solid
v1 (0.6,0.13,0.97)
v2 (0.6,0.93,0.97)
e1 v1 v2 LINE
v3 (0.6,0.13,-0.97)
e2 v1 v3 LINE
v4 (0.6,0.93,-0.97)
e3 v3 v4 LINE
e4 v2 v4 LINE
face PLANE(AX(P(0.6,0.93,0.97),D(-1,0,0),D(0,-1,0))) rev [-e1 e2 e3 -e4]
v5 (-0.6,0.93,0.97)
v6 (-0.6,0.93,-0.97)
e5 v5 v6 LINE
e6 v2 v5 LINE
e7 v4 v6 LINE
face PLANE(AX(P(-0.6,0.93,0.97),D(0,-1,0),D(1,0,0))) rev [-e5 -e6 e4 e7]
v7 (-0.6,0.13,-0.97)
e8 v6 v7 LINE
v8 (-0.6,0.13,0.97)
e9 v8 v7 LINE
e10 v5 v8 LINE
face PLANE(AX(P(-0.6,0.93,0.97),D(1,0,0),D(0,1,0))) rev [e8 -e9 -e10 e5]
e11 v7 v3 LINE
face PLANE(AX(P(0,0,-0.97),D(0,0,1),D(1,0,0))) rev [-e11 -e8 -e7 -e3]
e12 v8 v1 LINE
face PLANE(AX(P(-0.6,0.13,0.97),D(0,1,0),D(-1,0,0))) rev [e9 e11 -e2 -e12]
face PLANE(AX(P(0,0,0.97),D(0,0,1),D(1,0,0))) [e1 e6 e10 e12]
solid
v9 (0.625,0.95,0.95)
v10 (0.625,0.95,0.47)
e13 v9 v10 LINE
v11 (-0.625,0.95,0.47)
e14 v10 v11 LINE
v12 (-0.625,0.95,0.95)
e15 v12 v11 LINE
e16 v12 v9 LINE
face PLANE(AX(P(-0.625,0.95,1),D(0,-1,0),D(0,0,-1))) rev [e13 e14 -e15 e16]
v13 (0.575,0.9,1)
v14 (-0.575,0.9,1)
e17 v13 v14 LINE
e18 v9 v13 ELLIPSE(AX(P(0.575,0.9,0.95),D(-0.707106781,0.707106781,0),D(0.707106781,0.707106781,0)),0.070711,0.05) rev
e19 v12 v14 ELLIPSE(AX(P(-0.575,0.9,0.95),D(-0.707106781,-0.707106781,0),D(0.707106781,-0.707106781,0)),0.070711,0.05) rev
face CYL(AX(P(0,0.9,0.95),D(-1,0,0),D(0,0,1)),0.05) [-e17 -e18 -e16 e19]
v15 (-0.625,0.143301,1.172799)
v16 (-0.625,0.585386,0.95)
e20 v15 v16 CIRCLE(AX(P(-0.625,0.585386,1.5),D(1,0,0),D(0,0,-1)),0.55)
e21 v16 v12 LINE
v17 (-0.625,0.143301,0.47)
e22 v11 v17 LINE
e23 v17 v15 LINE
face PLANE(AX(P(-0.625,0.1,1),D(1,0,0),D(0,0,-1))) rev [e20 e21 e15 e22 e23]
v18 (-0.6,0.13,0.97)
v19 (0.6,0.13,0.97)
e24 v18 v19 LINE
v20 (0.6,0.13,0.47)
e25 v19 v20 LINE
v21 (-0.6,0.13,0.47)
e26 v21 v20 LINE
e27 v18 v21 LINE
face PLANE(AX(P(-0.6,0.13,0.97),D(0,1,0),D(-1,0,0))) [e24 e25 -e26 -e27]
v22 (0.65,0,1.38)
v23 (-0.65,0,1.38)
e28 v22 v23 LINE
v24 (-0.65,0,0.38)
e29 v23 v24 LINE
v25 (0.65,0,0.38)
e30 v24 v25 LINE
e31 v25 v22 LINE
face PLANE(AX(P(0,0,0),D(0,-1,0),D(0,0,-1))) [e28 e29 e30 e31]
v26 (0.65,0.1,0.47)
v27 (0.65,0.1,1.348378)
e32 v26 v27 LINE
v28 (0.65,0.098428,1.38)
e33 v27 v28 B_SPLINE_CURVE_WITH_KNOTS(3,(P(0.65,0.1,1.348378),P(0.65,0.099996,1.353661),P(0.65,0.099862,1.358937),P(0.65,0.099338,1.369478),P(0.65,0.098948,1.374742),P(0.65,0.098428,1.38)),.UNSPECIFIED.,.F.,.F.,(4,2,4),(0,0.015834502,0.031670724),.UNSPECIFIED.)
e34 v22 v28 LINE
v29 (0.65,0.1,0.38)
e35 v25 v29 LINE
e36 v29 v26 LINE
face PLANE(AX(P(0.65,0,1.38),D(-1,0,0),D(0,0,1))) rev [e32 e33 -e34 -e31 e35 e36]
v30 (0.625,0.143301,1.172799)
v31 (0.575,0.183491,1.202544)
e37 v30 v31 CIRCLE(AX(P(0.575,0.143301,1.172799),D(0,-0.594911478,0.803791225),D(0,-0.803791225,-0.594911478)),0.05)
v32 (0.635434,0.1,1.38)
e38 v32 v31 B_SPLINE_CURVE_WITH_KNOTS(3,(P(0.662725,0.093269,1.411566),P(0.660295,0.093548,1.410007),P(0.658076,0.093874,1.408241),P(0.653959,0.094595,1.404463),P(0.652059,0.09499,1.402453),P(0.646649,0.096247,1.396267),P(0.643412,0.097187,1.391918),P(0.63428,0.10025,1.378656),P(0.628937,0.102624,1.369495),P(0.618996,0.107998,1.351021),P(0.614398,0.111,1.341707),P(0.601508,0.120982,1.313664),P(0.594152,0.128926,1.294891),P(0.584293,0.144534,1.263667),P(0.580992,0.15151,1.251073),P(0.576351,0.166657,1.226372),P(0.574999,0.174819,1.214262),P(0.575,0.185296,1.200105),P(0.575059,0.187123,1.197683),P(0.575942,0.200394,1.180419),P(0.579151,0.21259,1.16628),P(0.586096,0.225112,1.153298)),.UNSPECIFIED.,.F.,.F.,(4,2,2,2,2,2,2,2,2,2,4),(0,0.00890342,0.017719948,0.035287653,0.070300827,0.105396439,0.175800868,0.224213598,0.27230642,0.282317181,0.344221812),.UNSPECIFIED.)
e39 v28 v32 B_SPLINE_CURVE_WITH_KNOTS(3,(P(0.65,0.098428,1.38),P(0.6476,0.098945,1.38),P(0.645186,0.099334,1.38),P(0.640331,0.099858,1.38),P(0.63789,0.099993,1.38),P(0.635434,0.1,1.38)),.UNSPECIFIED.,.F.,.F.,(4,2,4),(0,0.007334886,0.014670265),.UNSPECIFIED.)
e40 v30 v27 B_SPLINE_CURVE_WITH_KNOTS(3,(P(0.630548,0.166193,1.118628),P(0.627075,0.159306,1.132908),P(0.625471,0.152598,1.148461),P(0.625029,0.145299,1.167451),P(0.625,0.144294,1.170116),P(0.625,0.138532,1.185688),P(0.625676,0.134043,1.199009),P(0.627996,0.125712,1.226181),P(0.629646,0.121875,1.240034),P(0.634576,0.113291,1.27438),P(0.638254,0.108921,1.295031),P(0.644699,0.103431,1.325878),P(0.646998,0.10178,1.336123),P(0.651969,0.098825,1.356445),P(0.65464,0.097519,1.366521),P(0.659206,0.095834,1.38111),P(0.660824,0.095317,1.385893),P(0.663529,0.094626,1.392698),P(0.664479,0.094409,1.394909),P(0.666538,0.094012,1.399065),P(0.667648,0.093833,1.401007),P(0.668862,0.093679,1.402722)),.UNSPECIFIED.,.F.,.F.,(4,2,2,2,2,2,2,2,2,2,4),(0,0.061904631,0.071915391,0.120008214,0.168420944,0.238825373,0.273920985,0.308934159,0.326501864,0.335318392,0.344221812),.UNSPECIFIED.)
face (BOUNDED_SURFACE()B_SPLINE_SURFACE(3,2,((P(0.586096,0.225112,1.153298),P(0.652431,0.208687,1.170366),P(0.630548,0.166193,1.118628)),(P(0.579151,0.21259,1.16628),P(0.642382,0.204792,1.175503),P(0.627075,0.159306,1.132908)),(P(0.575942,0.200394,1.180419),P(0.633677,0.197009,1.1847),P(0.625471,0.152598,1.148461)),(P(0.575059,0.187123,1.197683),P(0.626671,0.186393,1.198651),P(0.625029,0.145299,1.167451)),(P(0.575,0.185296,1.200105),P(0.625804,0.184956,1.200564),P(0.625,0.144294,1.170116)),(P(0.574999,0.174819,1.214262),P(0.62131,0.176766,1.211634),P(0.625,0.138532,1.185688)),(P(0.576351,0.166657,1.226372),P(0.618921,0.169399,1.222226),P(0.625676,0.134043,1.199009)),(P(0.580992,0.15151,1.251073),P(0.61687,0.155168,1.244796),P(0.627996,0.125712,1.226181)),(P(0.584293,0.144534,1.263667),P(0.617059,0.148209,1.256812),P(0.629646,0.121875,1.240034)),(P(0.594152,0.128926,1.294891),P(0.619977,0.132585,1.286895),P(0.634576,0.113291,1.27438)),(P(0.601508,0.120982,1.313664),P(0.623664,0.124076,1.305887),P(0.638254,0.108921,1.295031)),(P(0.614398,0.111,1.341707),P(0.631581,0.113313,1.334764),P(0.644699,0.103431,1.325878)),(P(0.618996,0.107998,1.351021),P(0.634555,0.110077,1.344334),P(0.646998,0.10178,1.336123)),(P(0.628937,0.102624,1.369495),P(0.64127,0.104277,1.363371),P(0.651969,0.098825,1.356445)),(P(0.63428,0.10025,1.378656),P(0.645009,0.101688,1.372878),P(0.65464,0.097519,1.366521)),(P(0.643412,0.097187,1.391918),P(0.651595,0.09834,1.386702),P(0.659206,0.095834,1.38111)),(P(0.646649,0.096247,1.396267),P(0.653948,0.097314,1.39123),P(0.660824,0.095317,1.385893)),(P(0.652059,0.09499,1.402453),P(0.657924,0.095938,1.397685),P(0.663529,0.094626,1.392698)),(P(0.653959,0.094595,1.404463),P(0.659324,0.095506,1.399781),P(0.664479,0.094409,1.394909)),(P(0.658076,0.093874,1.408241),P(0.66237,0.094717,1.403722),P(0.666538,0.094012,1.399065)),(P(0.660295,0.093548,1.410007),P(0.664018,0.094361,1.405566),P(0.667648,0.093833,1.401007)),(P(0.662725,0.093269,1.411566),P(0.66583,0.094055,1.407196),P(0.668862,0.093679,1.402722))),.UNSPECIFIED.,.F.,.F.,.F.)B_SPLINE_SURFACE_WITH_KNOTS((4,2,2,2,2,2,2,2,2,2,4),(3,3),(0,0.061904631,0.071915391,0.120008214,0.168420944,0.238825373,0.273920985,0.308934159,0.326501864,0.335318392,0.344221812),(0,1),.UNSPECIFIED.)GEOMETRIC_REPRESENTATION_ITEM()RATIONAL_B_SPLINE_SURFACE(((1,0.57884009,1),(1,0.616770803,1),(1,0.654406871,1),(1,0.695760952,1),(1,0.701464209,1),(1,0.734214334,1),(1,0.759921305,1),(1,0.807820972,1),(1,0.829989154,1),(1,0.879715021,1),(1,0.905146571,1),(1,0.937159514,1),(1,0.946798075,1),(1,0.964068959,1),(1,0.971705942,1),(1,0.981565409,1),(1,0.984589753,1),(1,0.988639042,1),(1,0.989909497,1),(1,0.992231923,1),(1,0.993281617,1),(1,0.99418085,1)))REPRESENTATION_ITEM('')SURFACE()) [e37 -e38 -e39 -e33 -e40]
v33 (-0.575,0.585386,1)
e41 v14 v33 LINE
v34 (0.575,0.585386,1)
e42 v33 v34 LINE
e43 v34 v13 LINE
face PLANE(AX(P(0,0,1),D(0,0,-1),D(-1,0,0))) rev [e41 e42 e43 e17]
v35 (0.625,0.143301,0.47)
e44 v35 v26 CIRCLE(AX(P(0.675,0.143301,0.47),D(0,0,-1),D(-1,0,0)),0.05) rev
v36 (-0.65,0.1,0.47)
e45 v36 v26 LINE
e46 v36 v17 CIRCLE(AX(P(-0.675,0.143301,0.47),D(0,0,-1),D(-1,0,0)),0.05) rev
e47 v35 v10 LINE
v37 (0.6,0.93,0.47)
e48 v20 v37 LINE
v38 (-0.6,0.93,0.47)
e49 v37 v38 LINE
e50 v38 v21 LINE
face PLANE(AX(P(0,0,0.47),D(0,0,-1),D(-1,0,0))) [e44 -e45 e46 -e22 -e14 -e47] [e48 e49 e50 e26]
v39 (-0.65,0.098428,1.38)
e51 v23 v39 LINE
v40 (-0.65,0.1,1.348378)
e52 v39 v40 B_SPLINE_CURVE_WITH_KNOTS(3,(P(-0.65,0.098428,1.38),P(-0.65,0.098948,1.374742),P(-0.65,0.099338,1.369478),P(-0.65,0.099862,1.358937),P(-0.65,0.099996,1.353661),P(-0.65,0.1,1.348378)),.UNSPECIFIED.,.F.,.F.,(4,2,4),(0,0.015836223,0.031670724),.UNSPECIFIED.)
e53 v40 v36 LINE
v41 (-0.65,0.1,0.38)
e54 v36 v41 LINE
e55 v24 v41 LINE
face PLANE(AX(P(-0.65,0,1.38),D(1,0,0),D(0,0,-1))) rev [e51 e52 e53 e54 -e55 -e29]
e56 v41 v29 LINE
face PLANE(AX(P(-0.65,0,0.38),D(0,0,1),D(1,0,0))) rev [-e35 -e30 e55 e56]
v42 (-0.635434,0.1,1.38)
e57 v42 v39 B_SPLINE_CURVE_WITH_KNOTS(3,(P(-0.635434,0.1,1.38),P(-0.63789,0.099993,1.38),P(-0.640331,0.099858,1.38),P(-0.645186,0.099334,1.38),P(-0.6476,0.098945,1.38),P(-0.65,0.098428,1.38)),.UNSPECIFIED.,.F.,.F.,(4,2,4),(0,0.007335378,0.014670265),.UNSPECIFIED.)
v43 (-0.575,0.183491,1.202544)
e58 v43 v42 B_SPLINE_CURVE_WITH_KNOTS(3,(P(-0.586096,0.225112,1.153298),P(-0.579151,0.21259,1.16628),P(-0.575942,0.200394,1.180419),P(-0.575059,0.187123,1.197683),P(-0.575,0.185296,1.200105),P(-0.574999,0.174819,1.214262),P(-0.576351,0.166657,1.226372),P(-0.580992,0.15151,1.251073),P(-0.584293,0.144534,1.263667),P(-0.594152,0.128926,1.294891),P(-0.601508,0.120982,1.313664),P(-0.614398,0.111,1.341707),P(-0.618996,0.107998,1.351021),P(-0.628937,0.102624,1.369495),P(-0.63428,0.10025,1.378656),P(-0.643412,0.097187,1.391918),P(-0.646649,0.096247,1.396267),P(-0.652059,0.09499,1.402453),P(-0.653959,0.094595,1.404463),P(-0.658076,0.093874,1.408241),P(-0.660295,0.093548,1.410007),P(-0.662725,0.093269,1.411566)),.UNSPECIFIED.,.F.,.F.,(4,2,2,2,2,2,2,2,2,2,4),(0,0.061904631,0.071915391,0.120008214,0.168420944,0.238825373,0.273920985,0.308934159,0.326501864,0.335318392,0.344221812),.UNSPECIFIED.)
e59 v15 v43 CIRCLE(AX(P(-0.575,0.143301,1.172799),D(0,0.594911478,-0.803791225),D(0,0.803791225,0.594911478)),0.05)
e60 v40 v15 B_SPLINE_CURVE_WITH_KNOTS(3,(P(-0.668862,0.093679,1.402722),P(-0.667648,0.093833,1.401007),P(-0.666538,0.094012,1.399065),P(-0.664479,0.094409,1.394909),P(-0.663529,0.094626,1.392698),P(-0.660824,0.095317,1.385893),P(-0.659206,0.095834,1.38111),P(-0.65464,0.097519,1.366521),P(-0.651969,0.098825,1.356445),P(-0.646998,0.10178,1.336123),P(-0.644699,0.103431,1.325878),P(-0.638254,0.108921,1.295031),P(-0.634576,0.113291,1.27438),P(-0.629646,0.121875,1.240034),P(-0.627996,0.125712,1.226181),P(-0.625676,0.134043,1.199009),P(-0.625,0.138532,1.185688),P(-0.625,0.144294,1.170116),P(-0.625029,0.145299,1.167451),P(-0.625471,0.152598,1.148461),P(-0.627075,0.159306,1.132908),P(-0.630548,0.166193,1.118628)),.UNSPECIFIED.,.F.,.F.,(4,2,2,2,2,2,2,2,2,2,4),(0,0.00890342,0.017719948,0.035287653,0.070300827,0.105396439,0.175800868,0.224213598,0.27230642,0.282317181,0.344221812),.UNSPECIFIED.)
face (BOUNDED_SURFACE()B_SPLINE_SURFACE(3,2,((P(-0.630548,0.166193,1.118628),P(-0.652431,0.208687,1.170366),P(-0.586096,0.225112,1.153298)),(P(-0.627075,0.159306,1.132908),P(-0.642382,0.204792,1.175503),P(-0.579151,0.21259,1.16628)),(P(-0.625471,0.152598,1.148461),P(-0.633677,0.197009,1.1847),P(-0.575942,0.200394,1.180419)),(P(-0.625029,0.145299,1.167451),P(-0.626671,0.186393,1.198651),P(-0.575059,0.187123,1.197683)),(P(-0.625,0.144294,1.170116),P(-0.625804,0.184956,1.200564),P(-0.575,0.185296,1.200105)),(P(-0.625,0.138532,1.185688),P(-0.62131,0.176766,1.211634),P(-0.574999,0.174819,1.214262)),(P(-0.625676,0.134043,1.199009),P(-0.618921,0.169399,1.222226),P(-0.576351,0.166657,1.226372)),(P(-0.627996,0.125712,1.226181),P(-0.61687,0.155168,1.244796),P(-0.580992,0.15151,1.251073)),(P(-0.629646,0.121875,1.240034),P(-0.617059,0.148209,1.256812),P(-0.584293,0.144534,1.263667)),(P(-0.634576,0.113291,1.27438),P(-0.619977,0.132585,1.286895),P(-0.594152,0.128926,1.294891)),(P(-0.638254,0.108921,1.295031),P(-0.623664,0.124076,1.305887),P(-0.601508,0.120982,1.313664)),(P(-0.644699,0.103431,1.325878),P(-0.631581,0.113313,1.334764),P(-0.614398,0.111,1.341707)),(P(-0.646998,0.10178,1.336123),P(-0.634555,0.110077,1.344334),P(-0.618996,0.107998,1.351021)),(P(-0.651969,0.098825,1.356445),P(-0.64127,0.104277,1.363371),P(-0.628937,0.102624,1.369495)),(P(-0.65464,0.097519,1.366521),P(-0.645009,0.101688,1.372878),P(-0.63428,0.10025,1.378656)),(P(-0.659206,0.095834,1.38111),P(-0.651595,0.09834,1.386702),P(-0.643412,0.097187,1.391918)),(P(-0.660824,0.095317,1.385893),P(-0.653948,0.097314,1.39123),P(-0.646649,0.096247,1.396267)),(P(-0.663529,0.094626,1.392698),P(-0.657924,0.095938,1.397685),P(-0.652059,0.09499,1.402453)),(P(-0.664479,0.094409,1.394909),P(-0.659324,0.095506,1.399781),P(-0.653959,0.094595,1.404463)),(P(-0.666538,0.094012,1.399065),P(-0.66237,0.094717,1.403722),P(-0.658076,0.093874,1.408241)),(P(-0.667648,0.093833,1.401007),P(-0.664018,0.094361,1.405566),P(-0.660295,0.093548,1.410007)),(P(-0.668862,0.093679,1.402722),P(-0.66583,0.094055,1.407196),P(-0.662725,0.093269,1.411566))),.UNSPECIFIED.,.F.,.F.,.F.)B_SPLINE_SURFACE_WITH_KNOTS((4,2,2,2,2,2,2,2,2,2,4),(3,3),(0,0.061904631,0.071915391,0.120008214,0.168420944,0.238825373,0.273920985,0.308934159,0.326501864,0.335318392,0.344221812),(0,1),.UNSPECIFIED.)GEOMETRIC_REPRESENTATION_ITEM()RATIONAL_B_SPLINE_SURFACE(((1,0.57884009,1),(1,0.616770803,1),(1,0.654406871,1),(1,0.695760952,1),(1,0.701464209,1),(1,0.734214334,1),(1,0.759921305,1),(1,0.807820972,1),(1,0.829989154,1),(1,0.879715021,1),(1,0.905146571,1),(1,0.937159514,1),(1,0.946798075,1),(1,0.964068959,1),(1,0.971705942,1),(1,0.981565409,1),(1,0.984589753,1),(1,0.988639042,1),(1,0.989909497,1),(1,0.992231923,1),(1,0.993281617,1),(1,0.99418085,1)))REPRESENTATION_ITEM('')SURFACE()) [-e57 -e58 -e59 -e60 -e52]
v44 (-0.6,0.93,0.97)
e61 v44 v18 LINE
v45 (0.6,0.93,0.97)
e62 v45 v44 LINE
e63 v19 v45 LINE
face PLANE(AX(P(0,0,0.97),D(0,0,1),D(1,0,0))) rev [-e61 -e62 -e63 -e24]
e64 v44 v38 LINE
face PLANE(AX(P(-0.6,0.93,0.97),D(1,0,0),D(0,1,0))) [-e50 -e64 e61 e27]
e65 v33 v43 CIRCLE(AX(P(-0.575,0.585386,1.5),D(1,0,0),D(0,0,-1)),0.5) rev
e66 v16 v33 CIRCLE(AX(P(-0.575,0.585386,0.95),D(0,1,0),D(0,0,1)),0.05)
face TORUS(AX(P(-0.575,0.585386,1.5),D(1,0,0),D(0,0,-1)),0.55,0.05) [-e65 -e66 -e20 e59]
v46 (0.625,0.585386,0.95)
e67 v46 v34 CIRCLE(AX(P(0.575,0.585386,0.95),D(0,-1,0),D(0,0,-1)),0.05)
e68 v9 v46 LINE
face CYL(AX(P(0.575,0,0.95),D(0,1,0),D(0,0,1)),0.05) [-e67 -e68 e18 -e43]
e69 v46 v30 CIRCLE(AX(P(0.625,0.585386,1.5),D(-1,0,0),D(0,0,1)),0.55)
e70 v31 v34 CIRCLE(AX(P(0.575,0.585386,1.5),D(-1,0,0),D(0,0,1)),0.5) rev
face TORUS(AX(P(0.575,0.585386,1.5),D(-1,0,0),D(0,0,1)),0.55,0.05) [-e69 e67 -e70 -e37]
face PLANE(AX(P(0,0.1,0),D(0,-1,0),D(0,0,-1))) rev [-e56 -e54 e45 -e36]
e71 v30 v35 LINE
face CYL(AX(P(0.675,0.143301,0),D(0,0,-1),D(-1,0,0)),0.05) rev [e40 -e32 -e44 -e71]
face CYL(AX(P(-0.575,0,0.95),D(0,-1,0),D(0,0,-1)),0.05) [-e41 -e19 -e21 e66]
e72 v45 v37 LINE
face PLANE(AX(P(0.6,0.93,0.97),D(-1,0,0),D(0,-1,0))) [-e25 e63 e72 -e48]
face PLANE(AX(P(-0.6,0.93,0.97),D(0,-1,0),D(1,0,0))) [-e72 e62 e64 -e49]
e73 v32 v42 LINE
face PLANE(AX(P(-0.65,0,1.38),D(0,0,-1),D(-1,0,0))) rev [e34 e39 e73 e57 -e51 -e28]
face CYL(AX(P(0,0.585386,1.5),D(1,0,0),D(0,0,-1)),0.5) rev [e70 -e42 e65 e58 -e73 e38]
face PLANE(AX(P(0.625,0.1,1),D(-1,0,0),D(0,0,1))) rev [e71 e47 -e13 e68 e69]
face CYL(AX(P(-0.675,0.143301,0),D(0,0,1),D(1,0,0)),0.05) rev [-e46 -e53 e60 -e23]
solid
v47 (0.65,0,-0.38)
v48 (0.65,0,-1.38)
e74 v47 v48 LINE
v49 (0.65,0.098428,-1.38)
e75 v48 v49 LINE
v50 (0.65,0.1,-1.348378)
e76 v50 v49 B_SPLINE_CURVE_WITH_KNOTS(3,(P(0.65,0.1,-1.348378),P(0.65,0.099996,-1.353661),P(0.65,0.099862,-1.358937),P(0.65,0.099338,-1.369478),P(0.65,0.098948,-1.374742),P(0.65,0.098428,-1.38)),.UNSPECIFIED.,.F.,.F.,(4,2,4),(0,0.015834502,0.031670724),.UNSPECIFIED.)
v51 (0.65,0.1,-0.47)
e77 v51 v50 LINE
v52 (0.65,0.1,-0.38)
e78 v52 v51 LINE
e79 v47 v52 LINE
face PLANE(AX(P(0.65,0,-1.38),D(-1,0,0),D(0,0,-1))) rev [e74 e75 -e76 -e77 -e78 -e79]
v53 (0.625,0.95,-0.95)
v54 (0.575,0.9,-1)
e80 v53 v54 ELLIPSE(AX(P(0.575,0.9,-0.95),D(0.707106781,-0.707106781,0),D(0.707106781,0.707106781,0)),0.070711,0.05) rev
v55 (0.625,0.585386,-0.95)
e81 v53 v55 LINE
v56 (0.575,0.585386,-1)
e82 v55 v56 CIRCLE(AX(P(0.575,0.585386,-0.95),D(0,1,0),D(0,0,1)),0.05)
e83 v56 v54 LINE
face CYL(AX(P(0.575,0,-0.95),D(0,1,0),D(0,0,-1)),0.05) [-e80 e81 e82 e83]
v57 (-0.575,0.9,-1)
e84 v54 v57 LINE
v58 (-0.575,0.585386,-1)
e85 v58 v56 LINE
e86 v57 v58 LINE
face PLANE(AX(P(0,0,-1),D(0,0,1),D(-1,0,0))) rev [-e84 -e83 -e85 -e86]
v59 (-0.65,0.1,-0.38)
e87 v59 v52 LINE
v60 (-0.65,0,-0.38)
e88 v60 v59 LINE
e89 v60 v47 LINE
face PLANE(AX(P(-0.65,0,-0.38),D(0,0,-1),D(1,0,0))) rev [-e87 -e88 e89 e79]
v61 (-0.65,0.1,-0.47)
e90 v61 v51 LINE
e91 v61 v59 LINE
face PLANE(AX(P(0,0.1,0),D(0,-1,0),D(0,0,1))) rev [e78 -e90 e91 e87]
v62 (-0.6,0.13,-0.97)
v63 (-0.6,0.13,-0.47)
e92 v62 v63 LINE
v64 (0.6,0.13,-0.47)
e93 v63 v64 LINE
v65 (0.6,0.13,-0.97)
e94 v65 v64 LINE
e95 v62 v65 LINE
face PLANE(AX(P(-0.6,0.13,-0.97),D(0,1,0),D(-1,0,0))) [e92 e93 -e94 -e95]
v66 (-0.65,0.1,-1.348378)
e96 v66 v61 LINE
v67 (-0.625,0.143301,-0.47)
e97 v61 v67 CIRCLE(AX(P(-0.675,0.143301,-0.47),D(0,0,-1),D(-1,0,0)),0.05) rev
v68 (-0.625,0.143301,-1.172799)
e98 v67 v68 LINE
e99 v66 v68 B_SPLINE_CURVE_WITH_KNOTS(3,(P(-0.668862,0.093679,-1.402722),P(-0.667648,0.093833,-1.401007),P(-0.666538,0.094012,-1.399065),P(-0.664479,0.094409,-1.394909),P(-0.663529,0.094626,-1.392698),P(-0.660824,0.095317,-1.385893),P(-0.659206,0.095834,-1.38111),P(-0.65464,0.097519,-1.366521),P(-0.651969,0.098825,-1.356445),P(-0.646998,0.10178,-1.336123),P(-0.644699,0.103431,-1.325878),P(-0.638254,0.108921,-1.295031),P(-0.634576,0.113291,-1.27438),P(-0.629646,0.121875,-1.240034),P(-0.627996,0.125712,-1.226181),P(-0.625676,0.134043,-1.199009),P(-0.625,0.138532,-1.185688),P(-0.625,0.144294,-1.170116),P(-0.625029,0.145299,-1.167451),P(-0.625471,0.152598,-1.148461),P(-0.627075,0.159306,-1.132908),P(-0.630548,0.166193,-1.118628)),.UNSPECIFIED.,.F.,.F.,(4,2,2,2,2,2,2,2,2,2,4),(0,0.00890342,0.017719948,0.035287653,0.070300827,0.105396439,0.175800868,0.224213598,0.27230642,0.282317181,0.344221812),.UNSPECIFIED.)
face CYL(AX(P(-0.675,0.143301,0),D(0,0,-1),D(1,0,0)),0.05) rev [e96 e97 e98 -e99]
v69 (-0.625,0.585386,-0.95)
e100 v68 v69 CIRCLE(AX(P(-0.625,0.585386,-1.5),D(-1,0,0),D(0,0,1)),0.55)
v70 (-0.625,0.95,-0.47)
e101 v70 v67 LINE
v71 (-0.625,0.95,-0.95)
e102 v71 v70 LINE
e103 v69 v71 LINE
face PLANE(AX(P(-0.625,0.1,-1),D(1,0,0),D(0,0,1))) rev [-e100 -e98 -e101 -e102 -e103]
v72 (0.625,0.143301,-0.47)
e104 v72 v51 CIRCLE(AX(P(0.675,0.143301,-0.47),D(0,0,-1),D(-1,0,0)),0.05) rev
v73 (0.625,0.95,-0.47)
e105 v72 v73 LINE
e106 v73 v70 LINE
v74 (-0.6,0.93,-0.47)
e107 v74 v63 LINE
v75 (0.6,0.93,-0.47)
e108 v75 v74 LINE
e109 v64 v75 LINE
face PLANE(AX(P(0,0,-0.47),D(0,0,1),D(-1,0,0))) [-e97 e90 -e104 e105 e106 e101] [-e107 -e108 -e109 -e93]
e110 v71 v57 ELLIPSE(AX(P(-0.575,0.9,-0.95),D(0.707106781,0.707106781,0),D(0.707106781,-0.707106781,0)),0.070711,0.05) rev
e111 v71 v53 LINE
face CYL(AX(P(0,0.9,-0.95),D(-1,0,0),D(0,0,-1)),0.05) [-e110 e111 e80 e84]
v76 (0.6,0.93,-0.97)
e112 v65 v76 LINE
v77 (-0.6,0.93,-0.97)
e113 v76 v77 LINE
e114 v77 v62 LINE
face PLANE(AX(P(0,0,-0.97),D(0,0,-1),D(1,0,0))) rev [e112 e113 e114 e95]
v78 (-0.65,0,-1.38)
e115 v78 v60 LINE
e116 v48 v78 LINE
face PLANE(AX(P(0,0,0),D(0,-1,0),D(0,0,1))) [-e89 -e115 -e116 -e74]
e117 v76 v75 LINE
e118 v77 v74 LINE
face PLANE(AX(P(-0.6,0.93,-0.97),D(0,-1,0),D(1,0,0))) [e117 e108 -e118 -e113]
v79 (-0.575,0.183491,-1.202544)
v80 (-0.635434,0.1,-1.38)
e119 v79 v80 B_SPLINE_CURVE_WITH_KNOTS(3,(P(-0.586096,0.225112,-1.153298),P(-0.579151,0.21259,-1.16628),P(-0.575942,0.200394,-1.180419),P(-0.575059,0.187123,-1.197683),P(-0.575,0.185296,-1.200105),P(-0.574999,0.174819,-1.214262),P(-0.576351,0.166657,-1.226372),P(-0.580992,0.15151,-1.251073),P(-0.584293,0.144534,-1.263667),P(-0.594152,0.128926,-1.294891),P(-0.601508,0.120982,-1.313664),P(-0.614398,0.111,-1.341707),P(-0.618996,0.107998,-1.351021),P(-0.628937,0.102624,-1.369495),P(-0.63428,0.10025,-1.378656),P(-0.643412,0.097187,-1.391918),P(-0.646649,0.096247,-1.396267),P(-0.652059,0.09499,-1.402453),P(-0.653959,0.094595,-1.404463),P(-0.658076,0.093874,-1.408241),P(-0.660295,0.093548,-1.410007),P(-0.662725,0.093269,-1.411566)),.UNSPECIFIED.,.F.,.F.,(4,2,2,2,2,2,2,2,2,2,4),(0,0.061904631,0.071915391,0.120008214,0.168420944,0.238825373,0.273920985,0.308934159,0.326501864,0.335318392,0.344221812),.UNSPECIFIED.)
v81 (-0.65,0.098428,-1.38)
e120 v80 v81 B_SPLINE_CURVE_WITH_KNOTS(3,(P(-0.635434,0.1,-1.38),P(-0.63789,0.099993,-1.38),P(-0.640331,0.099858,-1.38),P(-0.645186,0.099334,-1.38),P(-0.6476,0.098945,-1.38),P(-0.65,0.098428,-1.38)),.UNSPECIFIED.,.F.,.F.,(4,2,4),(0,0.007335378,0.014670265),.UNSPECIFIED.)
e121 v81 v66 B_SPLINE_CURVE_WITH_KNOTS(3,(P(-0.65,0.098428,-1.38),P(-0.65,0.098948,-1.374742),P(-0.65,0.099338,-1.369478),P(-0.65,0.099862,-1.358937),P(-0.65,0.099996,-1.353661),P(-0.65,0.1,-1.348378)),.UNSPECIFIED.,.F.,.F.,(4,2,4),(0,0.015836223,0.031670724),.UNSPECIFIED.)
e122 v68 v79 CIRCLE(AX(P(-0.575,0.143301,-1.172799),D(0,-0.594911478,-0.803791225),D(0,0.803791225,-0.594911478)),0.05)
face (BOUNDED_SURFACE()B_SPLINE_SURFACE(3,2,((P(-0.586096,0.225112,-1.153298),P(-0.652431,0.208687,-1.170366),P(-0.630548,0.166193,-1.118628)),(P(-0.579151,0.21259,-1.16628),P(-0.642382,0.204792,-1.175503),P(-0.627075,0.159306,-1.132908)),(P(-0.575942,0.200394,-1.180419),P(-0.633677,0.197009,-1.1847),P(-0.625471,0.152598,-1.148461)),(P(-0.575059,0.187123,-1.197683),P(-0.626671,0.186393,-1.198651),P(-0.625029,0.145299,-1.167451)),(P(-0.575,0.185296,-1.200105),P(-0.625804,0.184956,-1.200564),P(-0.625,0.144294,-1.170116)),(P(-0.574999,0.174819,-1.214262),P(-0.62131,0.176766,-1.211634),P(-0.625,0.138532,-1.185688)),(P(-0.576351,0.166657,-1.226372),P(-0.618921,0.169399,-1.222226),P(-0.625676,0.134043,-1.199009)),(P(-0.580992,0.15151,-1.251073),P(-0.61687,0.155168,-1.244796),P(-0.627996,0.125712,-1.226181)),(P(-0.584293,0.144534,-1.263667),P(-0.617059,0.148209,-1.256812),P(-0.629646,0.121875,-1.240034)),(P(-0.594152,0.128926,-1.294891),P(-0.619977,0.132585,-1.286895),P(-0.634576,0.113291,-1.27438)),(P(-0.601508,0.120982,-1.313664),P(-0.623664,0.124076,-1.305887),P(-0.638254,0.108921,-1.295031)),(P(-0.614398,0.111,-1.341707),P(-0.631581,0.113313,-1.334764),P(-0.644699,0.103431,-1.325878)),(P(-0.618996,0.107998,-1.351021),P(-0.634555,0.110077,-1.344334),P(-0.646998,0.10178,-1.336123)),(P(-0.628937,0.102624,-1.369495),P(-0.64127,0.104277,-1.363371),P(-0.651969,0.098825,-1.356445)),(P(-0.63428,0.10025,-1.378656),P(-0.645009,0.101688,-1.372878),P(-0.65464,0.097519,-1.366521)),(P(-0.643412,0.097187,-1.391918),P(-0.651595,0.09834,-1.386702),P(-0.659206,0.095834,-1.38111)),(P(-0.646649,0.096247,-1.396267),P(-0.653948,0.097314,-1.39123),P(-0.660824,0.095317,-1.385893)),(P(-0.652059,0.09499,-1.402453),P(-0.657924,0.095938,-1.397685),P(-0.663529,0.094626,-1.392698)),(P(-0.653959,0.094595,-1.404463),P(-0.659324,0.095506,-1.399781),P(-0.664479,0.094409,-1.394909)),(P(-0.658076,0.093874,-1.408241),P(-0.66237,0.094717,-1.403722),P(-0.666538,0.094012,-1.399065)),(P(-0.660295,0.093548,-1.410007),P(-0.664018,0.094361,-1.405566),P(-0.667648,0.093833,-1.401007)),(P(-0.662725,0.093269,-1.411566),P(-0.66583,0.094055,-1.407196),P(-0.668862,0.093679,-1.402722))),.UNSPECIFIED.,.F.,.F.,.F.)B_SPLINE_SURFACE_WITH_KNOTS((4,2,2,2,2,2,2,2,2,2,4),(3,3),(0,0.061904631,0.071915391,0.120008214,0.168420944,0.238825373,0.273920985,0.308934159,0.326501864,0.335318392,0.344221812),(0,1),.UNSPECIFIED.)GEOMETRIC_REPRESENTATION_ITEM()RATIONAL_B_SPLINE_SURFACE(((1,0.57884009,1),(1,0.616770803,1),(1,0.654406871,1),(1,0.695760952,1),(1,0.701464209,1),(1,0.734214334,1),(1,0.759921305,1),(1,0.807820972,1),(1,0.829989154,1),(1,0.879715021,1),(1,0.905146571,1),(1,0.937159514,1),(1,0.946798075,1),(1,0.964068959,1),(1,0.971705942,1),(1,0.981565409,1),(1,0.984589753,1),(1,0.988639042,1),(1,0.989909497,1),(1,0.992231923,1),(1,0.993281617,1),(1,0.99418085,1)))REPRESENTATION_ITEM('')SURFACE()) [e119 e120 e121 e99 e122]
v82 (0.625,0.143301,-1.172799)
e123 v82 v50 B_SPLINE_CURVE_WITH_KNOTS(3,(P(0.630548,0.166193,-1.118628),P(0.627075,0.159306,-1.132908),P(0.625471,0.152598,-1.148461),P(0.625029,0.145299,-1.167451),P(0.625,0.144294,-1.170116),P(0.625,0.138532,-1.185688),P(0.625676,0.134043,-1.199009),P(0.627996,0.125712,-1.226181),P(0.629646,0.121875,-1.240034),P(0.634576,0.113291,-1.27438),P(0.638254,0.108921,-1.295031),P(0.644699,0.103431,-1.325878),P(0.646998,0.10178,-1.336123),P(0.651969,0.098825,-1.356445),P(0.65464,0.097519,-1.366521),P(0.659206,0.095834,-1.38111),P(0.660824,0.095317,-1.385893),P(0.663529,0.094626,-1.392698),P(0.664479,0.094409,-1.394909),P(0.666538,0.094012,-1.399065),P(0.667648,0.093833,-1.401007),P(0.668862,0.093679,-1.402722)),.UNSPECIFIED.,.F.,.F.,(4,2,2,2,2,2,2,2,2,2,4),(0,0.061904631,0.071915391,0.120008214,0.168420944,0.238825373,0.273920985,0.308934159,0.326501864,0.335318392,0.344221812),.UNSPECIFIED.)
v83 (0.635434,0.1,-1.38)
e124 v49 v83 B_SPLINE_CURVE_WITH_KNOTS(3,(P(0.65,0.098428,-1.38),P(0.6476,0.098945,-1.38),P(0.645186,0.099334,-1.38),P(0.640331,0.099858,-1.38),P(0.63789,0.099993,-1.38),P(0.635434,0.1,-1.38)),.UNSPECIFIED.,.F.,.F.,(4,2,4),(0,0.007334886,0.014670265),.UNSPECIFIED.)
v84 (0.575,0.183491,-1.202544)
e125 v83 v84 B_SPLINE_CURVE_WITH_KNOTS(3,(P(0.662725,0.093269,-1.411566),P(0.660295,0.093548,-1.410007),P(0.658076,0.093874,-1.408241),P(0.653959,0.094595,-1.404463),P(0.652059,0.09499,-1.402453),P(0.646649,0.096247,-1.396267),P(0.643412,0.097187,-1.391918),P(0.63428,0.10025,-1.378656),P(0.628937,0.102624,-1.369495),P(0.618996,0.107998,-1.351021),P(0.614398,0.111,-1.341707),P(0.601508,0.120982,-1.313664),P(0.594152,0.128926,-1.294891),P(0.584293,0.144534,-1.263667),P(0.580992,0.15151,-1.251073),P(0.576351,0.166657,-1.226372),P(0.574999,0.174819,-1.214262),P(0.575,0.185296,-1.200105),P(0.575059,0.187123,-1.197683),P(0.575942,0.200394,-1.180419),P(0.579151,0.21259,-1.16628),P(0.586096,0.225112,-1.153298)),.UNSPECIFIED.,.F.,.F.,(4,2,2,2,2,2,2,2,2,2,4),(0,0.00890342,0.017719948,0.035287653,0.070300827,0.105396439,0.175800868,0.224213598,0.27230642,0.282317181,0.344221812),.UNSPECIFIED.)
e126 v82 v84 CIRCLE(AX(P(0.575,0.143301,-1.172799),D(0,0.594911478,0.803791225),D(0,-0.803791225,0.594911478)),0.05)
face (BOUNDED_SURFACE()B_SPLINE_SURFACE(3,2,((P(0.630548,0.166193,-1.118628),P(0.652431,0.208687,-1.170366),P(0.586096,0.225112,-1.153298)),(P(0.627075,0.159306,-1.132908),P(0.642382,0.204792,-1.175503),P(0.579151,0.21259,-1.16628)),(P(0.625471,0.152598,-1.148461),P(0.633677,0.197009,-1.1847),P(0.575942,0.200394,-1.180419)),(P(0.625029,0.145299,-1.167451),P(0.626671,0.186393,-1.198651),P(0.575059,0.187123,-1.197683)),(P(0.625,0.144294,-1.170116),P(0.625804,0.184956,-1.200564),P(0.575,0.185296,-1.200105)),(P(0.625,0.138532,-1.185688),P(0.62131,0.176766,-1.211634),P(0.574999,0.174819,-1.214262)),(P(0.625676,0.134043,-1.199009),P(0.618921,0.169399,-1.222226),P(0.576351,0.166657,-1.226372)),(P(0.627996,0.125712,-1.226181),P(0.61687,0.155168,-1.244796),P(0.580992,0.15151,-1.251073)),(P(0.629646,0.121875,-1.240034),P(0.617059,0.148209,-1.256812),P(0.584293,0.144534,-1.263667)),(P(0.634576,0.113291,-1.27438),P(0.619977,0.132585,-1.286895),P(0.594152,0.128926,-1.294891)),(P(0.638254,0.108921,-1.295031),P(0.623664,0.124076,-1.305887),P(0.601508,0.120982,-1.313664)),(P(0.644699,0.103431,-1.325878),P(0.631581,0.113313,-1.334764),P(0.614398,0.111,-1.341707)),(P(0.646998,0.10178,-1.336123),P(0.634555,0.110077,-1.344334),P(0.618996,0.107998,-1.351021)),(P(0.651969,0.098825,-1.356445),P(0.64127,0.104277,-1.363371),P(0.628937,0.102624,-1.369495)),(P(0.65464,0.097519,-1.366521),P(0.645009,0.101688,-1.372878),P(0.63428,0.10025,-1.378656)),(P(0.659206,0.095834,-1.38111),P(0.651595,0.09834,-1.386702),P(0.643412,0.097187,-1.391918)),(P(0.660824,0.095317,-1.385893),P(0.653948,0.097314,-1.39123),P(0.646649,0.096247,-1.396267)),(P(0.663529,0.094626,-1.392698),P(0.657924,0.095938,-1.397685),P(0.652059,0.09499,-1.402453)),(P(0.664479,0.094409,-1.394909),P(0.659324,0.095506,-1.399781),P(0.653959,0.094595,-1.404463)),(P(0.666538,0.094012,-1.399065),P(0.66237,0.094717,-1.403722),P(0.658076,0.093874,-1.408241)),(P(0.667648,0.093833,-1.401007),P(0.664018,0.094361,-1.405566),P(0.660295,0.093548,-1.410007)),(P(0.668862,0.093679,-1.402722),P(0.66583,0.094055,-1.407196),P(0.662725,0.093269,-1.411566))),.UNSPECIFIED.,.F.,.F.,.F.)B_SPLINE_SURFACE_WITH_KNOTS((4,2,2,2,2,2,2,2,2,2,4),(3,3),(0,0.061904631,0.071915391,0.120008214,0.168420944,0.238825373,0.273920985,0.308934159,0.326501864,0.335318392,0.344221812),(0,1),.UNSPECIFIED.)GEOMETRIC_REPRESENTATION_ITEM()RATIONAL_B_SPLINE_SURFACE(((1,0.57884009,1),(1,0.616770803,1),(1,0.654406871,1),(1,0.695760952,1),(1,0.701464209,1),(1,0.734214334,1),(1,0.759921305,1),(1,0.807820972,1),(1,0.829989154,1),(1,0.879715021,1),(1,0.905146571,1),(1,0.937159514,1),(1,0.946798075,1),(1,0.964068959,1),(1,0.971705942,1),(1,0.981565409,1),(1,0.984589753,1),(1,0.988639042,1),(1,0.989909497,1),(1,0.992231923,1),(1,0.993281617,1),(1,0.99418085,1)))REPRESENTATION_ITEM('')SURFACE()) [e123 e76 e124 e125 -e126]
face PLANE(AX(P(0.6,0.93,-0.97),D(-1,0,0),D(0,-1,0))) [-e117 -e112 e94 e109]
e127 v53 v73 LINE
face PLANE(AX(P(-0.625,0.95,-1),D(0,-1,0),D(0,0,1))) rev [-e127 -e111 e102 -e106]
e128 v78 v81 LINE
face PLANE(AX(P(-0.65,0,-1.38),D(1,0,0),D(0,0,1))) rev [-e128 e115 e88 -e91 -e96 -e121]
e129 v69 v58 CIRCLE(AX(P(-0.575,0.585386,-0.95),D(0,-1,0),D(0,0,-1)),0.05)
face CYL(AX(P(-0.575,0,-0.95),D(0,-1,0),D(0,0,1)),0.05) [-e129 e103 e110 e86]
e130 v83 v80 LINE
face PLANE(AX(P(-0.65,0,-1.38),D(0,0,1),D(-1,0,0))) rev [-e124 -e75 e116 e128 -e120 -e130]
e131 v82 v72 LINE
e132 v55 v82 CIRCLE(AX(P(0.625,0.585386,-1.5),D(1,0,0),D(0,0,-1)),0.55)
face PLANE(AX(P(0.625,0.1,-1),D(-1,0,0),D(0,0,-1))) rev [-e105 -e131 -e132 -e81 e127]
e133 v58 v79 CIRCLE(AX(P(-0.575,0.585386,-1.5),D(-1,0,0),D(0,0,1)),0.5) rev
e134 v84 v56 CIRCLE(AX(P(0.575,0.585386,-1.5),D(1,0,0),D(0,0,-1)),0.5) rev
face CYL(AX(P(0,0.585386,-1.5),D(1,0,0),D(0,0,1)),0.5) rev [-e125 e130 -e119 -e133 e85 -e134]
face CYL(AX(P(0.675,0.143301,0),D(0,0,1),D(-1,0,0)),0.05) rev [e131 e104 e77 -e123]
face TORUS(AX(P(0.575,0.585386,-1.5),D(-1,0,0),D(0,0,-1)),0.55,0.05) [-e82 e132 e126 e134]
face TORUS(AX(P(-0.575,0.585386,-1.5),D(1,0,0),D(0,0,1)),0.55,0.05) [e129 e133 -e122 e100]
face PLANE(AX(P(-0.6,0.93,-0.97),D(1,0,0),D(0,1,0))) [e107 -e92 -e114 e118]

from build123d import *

# Parameters (mm, degrees)
SKETCH1_W                = 1.2
SKETCH1_H                = 0.8
BOSS_EXTRUDE1_DEPTH      = 0.97
BOSS_EXTRUDE2_DEPTH      = 0.03
BOSS_EXTRUDE2_DEPTH_BACK = 0.5
SKETCH2_W                = 1.25
SKETCH2_H                = 0.85
INDENT1_START            = -0.6
INDENT1_OUTLINE_W        = 0.8
INDENT1_OUTLINE_H        = 0.5
INDENT1_DEPTH            = 1.2
SKETCH3_W                = 1.3
SKETCH3_H                = 1
BOSS_EXTRUDE3_DEPTH      = 0.1
FILLET1_R                = 0.05
FILLET2_START            = -0.6500001
FILLET2_DEPTH            = 1.3000001
FILLET2_START_2          = 1
FILLET2_2_DEPTH          = 1
FILLET3_R                = 0.05


with BuildPart() as part:
    # Sketch1 → Boss-Extrude1 (new, symmetric)
    with BuildSketch(Plane.XY):
        with Locations((0, 0.53)):
            Rectangle(SKETCH1_W, SKETCH1_H)
    extrude(amount=BOSS_EXTRUDE1_DEPTH, both=True)


with BuildPart() as body_2:
    # Sketch2 → Boss-Extrude2 (new, two sides: drawn at the far end of the back side and taken through both)
    with BuildSketch(Plane.XY.offset(0.97).offset(-BOSS_EXTRUDE2_DEPTH_BACK)):
        with Locations((0, 0.525)):
            Rectangle(SKETCH2_W, SKETCH2_H)
    extrude(amount=BOSS_EXTRUDE2_DEPTH + BOSS_EXTRUDE2_DEPTH_BACK)

    # Indent1: read off the stored shape, not the designer's step
    # Indent1 outline → Indent1 (cut)
    with BuildSketch(Plane.YZ.offset(INDENT1_START)):
        with Locations((0.53, 0.72)):
            Rectangle(INDENT1_OUTLINE_W, INDENT1_OUTLINE_H)
    extrude(amount=INDENT1_DEPTH, mode=Mode.SUBTRACT)

    # Sketch3 → Boss-Extrude3 (add)
    with BuildSketch(Plane.XZ.offset(-0.1)):
        with Locations((0, 0.88)):
            Rectangle(SKETCH3_W, SKETCH3_H)
    extrude(amount=BOSS_EXTRUDE3_DEPTH)

    # Fillet1
    # the kernel refuses this fillet: 0.05 mm, written as the material it adds along each edge
    with BuildSketch(Plane(origin=(0.625, 0.1, 0.47), x_dir=(1, 0, 0), z_dir=(0, 0, 1)), Plane(origin=(-0.625, 0.1, 1), x_dir=(-1, 0, 0), z_dir=(0, 0, -1))) as fillet1_piece_1:
        with BuildLine():
            CenterArc((0.05, 0.04330127), FILLET1_R, 180, 60)
            Line((0, 0.04330127), (-0.001, 0.04330127))
            Line((-0.001, 0.04330127), (-0.001, 0))
            Line((-0.001, 0), (0, -0.001))
            ThreePointArc((0, -0.001), (0.0125, -0.001), (0.0245, -0.000866025))
            Line((0.0245, -0.000866025), (0.025, 0))
        make_face()
    extrude(amount=0.53)

    # Fillet2: read off the stored shape, not the designer's step
    # Fillet2 outline → Fillet2 (add)
    with BuildSketch(Plane.YZ.offset(FILLET2_START)):
        with BuildLine():
            ThreePointArc((0.585386444, 1), (0.277165744, 1.106299606), (0.1, 1.38))
            Line((0.1, 1.38), (0.1, 1))
            Line((0.1, 1), (0.585386444, 1))
        make_face()
    extrude(amount=FILLET2_DEPTH)

    # Fillet2 2 outline → Fillet2 2 (cut)
    with BuildSketch(Plane.XY.offset(FILLET2_START_2)):
        with BuildLine():
            Line((0.625, 2), (0.625, 0.14330127))
            ThreePointArc((0.625, 0.14330127), (0.63169873, 0.11830127), (0.65, 0.1))
            Line((0.65, 0.1), (0.65, 2))
            Line((0.65, 2), (0.625, 2))
        make_face()
        with BuildLine():
            Line((-0.625, 0.14330127), (-0.625, 2))
            Line((-0.625, 2), (-0.65, 2))
            Line((-0.65, 2), (-0.65, 0.1))
            ThreePointArc((-0.65, 0.1), (-0.63169873, 0.11830127), (-0.625, 0.14330127))
        make_face()
    extrude(amount=FILLET2_2_DEPTH, mode=Mode.SUBTRACT)

    # Fillet3
    fillet3_edges = [body_2.edges().sort_by_distance(p)[0] for p in [
        (-0.625, 0.767693222, 1),
        (0, 0.95, 1),
        (0.625, 0.767693222, 1),
        (0.625, 0.327308121, 1.071752899),
        (0.631998085, 0.117789797, 1.322931157),
        (-0.631998085, 0.117789797, 1.322931157),
        (-0.625, 0.327308121, 1.071752899),
    ]]
    fillet(fillet3_edges, radius=FILLET3_R)


with BuildPart() as body_3:
    # Mirror1: mirrored copy
    add(body_2.part.mirror(Plane.XY))


solid = Compound([part.part, body_2.part, body_3.part])
